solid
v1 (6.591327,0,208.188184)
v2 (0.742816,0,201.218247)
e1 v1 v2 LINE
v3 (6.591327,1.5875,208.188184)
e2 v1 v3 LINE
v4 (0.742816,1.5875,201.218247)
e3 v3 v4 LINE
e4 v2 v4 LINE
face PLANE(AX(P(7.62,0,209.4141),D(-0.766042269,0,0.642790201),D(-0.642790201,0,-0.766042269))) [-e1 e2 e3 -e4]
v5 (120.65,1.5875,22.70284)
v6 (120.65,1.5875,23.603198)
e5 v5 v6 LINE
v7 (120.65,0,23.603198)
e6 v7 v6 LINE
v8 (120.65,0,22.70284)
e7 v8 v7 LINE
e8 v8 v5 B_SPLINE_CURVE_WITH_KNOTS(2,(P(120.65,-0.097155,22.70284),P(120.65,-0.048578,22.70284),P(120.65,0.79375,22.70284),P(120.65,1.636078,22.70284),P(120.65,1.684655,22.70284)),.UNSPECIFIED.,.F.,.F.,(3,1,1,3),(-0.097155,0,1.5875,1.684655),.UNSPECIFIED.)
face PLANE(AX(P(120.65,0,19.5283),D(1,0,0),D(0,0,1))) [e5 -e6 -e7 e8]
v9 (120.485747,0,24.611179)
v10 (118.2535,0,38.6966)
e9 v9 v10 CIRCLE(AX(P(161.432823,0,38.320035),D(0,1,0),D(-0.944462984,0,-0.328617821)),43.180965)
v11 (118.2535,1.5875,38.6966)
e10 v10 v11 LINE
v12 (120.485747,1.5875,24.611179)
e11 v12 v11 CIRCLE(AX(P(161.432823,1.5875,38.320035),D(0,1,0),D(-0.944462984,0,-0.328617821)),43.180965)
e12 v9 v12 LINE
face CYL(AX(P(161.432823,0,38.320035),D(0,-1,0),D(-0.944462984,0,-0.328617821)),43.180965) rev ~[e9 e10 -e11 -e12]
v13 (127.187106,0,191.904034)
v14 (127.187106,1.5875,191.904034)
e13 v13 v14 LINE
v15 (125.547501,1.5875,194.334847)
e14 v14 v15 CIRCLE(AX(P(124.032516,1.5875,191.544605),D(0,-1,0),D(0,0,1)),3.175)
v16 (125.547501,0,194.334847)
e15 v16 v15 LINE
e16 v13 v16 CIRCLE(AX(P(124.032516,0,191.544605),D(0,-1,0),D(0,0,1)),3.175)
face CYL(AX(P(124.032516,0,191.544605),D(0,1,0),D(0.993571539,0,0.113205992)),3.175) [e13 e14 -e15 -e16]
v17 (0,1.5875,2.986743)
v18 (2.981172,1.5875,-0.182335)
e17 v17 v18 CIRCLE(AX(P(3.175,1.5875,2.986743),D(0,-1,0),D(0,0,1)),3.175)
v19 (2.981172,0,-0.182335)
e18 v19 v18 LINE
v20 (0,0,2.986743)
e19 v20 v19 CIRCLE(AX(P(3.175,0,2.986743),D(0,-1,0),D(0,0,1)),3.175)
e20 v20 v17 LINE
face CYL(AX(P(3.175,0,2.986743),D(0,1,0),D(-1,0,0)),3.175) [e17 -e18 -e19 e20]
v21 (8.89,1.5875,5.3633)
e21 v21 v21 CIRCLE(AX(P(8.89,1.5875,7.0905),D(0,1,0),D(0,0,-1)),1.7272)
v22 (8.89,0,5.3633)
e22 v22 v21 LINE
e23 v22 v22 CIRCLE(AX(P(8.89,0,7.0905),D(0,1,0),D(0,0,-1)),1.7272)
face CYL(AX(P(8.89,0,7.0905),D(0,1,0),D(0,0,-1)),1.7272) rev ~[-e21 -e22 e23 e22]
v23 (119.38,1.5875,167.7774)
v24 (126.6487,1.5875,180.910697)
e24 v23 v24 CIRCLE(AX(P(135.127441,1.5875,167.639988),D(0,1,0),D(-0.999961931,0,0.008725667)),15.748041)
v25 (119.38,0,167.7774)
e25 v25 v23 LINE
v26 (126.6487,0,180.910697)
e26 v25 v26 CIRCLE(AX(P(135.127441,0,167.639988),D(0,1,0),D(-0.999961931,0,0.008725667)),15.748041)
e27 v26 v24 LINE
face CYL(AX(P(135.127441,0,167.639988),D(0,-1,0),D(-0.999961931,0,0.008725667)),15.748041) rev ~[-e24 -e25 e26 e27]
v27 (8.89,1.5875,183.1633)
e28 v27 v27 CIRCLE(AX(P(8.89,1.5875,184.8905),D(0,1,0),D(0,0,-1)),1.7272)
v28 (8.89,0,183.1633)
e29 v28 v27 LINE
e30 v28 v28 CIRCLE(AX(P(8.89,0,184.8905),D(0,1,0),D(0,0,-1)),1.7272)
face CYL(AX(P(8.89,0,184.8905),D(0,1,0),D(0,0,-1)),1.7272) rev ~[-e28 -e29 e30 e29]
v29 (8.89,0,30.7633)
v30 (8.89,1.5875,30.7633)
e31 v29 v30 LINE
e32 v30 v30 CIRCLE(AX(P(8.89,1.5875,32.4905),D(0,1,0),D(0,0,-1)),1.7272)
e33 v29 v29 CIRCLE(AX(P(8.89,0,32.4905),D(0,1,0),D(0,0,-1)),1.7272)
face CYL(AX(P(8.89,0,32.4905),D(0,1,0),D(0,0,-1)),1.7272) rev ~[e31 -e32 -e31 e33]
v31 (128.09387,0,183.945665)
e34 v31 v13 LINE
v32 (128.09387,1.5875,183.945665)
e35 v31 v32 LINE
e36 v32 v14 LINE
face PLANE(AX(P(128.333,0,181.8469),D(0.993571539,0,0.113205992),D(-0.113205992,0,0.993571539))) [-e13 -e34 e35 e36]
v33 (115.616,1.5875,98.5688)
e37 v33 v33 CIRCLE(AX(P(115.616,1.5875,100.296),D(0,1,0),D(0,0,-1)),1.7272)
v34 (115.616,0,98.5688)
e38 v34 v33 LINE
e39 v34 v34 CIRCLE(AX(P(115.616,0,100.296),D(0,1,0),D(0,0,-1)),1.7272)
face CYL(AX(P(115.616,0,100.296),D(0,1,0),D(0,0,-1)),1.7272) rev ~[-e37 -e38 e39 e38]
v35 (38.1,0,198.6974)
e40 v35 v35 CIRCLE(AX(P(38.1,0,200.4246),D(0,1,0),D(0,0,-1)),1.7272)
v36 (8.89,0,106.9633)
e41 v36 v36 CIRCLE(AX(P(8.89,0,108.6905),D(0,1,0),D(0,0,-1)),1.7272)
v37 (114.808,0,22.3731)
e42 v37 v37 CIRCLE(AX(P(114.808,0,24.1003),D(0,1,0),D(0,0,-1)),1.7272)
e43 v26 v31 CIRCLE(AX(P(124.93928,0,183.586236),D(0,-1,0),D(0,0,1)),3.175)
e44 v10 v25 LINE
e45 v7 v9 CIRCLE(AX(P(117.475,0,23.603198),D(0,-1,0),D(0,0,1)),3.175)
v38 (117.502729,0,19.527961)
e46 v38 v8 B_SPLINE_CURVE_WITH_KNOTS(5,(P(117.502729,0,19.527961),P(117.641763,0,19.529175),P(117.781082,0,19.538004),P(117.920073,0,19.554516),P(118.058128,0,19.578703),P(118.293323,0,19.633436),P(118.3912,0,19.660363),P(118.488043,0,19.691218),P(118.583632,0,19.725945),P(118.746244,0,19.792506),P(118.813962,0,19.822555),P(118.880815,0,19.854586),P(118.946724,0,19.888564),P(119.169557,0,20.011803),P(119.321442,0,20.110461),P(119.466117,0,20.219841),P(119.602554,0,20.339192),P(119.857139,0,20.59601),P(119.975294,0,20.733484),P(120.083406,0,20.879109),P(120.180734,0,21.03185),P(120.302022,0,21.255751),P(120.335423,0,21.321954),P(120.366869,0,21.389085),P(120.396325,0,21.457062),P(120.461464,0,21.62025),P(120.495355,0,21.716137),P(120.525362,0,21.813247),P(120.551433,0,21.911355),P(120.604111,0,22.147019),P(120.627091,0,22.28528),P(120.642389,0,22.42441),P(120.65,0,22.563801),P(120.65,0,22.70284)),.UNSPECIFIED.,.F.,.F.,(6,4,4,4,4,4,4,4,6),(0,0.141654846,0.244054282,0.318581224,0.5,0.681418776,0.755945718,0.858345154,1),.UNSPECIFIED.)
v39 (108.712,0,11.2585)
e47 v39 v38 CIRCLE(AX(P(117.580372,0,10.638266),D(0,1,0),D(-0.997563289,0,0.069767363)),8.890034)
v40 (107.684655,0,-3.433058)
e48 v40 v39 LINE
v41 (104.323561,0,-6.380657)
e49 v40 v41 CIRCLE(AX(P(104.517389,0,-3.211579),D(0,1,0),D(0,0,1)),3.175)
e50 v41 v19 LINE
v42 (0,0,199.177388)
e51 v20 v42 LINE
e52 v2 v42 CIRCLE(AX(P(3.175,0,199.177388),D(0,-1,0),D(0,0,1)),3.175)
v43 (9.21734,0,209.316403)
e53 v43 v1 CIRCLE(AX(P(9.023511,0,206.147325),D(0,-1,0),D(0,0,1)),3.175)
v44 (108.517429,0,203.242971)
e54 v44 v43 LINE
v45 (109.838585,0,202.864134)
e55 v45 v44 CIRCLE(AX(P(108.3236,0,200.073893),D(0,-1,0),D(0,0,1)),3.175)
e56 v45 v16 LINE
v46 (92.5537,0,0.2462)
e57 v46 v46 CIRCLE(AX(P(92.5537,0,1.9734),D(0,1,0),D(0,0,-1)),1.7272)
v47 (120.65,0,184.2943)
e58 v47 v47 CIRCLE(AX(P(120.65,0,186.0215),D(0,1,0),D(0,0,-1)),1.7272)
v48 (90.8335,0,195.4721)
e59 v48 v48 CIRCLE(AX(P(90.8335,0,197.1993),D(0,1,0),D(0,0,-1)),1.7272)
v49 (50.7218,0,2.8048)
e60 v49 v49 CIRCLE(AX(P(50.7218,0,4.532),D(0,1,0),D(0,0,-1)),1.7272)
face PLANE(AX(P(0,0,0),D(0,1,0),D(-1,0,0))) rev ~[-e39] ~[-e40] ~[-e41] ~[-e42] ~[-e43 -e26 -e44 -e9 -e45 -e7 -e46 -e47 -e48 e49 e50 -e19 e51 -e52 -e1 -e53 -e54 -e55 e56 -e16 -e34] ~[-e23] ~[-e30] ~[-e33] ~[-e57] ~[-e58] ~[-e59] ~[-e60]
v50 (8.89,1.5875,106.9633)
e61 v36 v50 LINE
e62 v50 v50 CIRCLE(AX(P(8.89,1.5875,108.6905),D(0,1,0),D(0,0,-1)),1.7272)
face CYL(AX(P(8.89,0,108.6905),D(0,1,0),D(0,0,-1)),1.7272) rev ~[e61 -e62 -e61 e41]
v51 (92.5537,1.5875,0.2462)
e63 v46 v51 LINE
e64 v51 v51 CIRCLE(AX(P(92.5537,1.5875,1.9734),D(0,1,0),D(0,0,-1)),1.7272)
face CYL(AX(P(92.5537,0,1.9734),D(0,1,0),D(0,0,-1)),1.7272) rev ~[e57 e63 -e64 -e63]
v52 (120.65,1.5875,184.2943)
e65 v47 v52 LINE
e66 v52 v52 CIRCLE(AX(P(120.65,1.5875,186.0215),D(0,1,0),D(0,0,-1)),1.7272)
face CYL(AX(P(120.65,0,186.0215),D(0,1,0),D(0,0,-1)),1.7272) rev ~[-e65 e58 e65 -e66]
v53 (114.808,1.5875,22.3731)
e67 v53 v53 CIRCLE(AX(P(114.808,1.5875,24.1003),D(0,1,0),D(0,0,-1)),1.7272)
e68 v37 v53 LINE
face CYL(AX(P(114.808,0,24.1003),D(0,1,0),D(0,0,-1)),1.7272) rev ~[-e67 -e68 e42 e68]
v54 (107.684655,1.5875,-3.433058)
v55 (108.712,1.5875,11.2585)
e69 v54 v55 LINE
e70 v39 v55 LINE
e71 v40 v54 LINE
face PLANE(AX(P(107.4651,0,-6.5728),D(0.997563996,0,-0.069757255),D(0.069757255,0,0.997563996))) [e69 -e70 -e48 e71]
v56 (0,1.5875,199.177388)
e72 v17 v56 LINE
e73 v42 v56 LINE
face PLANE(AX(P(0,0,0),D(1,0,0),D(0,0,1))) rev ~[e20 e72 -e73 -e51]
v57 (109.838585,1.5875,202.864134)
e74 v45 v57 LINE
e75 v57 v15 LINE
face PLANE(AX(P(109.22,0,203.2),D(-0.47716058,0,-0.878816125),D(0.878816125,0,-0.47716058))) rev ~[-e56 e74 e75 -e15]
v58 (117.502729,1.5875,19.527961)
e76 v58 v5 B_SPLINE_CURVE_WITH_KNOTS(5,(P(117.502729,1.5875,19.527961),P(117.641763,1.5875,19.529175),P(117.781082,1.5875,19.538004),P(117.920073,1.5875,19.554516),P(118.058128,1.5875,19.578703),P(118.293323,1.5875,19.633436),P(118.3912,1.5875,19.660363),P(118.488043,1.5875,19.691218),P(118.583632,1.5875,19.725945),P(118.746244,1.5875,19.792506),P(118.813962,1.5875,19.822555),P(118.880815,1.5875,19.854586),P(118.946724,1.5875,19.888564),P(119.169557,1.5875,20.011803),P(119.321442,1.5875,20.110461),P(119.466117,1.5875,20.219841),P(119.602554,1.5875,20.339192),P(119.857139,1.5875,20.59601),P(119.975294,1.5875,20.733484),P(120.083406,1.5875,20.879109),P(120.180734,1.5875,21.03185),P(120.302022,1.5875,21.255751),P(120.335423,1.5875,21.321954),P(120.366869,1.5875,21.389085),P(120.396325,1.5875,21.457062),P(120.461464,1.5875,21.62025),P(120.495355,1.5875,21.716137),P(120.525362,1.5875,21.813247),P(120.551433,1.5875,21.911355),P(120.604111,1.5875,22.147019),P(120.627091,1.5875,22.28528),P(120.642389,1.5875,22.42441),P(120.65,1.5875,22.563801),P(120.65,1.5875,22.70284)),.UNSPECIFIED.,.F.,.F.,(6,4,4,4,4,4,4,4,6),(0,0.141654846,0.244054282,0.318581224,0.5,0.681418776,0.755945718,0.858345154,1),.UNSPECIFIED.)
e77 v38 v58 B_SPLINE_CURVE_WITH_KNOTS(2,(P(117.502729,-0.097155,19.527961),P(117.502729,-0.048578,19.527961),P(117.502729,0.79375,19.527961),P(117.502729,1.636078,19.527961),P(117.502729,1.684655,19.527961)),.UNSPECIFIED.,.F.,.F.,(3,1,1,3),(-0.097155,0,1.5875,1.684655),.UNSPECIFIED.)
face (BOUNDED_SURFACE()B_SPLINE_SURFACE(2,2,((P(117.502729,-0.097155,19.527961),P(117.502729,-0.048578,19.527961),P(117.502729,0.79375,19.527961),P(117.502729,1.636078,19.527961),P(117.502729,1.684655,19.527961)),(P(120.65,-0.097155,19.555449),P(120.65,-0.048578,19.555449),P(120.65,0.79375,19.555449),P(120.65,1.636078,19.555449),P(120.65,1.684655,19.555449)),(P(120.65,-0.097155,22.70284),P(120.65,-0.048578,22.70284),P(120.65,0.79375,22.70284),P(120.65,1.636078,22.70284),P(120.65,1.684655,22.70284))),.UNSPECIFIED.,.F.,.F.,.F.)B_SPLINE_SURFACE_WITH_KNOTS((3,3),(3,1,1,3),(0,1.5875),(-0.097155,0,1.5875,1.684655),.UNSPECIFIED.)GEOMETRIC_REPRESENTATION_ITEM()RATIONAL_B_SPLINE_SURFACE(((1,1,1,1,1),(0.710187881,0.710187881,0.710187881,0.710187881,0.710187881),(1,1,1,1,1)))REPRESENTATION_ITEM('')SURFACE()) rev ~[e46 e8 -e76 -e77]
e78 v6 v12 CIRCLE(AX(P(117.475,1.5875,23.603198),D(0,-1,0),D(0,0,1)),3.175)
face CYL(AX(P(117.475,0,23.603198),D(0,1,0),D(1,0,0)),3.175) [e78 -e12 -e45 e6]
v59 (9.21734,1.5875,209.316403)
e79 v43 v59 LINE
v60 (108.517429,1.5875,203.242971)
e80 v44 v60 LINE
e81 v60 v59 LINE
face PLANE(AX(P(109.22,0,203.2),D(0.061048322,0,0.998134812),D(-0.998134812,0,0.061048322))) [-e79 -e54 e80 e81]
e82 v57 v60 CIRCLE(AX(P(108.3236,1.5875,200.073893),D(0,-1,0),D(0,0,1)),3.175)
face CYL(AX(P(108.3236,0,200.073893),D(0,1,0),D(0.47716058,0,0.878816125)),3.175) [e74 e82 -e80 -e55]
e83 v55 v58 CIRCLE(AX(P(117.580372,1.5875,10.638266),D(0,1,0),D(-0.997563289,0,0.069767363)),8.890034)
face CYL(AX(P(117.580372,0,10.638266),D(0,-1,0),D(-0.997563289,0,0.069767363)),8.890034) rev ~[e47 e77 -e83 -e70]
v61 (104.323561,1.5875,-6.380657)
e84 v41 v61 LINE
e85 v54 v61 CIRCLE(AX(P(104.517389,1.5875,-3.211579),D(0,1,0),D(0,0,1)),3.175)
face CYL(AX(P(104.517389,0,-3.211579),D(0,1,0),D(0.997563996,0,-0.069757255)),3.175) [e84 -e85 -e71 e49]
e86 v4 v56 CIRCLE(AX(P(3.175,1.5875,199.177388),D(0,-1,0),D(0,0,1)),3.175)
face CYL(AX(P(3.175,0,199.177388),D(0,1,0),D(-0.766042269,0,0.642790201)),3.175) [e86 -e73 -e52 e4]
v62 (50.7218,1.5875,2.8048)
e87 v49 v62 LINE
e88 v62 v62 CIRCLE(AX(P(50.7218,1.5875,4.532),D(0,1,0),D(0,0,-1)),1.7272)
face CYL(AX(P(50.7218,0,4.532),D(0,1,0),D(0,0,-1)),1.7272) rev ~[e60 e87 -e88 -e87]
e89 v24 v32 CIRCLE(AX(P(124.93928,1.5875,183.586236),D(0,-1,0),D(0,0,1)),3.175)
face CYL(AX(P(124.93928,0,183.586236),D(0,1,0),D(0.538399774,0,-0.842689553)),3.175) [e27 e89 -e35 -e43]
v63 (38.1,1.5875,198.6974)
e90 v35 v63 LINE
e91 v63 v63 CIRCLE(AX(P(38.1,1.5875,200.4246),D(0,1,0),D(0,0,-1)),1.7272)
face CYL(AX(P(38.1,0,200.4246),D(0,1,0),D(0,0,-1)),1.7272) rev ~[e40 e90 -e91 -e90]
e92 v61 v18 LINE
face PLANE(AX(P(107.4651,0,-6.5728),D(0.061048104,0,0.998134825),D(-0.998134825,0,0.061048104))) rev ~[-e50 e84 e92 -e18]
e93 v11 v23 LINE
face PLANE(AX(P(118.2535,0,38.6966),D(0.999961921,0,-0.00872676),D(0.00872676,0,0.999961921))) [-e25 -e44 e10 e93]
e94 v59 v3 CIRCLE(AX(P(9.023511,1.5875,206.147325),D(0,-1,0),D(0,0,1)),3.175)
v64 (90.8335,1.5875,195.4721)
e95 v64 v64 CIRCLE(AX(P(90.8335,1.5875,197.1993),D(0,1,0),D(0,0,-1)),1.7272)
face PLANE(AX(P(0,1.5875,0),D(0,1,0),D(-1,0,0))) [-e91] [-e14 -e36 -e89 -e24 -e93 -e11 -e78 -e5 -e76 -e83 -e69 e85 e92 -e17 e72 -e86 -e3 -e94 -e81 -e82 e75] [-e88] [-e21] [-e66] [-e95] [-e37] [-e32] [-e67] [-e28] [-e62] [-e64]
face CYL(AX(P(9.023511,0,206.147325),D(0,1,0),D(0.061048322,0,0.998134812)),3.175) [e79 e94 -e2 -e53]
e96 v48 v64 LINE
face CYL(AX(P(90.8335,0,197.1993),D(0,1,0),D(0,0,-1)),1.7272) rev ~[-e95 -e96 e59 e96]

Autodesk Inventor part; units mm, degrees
ref_plane "YZ Plane" through (0, 0, 0) normal (1, 0, 0) x (0, 1, 0)
ref_plane "XZ Plane" through (0, 0, 0) normal (0, 1, 0) x (-1, 0, 0)
ref_plane "XY Plane" through (0, 0, 0) normal (0, 0, 1) x (1, 0, 0)
sketch "Sketch1" plane through (0, 0, 0) normal (0, 1, 0) x (-1, 0, 0)
  line L0 (-107.4651, -6.5728) -> (-108.712, 11.2585)
  arc A0 (-108.712, 11.2585) -> (-117.5803, 19.5283) centre (-117.5803, 10.6383) ccw
  line L1 (-117.5803, 19.5283) -> (-120.65, 19.5283)
  line L2 (-120.65, 19.5283) -> (-120.65, 24.13)
  arc A1 (-120.65, 24.13) -> (-118.2535, 38.6966) centre (-161.4319, 38.3198) ccw
  line L3 (-128.333, 181.8469) -> (-127, 193.5462)
  line L4 (-109.22, 203.2) -> (-7.62, 209.4141)
  arc A2 (-119.38, 167.7774) -> (-128.333, 181.8469) centre (-135.1274, 167.64) ccw
  line L5 (-107.4651, -6.5728) -> (0, 0)
  line L6 (-7.62, 209.4141) -> (0, 200.333)
  line L7 (0, 0) -> (0, 200.333)
  line L8 (-109.22, 203.2) -> (-127, 193.5462)
  line L9 (-118.2535, 38.6966) -> (-119.38, 167.7774)
  line L10 (0, 0) -> (-88.3844, 0) construction
  line L11 (-8.89, 7.0905) -> (-8.89, 184.8905) construction
  line L12 (-8.89, 7.0905) -> (-92.5537, 1.9734) construction
  line L13 (-114.808, 24.1003) -> (-115.616, 100.296) construction
  line L14 (-114.808, 24.1003) -> (-120.65, 186.0215) construction
  line L15 (32.2864, 0) -> (-193.7183, 0) construction
  line L16 (-38.1, 200.4246) -> (-90.8335, 197.1993) construction
  line L17 (-58.42, 206.3071) -> (-52.8471, 115.1911) construction
  point P0 (-50.7218, 4.532)
  point P1 (-8.89, 108.6905)
  point P2 (-8.89, 32.4905)
  dimension "d52" = 76.2
  dimension "d54" = 76.2
  dimension "d98" = 25
  dimension "d99" = 55
  dimension "d100" = 86.5
  dimension "d103" = 8.89
  dimension "d104" = 7.62
  dimension "d106" = 203.2
  dimension "d108" = 127
  dimension "d109" = 109.22
  dimension "d111" = 167.64
  dimension "d112" = 120.65
  dimension "d114" = 41.91
  dimension "d115" = 41.91
  dimension "d118" = 76.2
  dimension "d122" = 8.89
  dimension "d123" = 86
  dimension "d124" = 43.18
  dimension "d125" = 15.748
  dimension "d127" = 52.832
  dimension "d128" = 7.112
  dimension "d129" = 38.1
  dimension "d130" = 140
  dimension "d131" = 7.62
  dimension "d161" = 25.4
  dimension "d162" = 119.38
  dimension "d163" = 3
  dimension "d166" = 108.712
  dimension "d167" = 114.808
  dimension "d168" = 120.65
  dimension "d170" = 3.175
  dimension "d171" = 26.67
  dimension "d172" = 24.13
  dimension "d174" = 4.572
  dimension "d175" = 193.04
extrude "Plate1" add sketch "Sketch1" along normal blind 1.5875
fillet "Corner Round1" radius 3.175 9 edges at (0, 0.7937, 200.333) (7.62, 0.7937, 209.4141) (120.65, 0.7937, 24.13) (120.65, 0.7937, 19.5283) (107.4651, 0.7937, -6.5728) (127, 0.7937, 193.5462) (109.22, 0.7937, 203.2) (128.333, 0.7937, 181.8469) (0, 0.7937, 0)
hole "Hole1" at (8.89, 0, 184.8905) at (38.1, 0, 200.4246) at (90.8335, 0, 197.1993) at (120.65, 0, 186.0215) at (115.616, 0, 100.296) at (114.808, 0, 24.1003) at (50.7218, 0, 4.532) at (92.5537, 0, 1.9734) at (8.89, 0, 7.0905) at (8.89, 0, 108.6905) at (8.89, 0, 32.4905) direction (0, 1, 0) diameter 3.4544 end through all
equation "\"d60\" = Thickness"
equation "\"d49\" = Thickness"
equation "\"BendReliefWidth\" = Thickness"
equation "\"BendReliefDepth\" = 0.5 * Thickness"
equation "\"CornerReliefSize\" = 4 * Thickness"
equation "\"MinimumRemnant\" = 2 * Thickness"
equation "\"TransitionRadius\" = BendRadius"
equation "\"JacobiRadiusSize\" = BendRadius"
equation "\"GapSize\" = Thickness"
equation "\"Thickness\" = 1.5875"
equation "\"BendRadius\" = 0.762"
properties part number "J009859" material "POLYCARBONATE, CLEAR"
